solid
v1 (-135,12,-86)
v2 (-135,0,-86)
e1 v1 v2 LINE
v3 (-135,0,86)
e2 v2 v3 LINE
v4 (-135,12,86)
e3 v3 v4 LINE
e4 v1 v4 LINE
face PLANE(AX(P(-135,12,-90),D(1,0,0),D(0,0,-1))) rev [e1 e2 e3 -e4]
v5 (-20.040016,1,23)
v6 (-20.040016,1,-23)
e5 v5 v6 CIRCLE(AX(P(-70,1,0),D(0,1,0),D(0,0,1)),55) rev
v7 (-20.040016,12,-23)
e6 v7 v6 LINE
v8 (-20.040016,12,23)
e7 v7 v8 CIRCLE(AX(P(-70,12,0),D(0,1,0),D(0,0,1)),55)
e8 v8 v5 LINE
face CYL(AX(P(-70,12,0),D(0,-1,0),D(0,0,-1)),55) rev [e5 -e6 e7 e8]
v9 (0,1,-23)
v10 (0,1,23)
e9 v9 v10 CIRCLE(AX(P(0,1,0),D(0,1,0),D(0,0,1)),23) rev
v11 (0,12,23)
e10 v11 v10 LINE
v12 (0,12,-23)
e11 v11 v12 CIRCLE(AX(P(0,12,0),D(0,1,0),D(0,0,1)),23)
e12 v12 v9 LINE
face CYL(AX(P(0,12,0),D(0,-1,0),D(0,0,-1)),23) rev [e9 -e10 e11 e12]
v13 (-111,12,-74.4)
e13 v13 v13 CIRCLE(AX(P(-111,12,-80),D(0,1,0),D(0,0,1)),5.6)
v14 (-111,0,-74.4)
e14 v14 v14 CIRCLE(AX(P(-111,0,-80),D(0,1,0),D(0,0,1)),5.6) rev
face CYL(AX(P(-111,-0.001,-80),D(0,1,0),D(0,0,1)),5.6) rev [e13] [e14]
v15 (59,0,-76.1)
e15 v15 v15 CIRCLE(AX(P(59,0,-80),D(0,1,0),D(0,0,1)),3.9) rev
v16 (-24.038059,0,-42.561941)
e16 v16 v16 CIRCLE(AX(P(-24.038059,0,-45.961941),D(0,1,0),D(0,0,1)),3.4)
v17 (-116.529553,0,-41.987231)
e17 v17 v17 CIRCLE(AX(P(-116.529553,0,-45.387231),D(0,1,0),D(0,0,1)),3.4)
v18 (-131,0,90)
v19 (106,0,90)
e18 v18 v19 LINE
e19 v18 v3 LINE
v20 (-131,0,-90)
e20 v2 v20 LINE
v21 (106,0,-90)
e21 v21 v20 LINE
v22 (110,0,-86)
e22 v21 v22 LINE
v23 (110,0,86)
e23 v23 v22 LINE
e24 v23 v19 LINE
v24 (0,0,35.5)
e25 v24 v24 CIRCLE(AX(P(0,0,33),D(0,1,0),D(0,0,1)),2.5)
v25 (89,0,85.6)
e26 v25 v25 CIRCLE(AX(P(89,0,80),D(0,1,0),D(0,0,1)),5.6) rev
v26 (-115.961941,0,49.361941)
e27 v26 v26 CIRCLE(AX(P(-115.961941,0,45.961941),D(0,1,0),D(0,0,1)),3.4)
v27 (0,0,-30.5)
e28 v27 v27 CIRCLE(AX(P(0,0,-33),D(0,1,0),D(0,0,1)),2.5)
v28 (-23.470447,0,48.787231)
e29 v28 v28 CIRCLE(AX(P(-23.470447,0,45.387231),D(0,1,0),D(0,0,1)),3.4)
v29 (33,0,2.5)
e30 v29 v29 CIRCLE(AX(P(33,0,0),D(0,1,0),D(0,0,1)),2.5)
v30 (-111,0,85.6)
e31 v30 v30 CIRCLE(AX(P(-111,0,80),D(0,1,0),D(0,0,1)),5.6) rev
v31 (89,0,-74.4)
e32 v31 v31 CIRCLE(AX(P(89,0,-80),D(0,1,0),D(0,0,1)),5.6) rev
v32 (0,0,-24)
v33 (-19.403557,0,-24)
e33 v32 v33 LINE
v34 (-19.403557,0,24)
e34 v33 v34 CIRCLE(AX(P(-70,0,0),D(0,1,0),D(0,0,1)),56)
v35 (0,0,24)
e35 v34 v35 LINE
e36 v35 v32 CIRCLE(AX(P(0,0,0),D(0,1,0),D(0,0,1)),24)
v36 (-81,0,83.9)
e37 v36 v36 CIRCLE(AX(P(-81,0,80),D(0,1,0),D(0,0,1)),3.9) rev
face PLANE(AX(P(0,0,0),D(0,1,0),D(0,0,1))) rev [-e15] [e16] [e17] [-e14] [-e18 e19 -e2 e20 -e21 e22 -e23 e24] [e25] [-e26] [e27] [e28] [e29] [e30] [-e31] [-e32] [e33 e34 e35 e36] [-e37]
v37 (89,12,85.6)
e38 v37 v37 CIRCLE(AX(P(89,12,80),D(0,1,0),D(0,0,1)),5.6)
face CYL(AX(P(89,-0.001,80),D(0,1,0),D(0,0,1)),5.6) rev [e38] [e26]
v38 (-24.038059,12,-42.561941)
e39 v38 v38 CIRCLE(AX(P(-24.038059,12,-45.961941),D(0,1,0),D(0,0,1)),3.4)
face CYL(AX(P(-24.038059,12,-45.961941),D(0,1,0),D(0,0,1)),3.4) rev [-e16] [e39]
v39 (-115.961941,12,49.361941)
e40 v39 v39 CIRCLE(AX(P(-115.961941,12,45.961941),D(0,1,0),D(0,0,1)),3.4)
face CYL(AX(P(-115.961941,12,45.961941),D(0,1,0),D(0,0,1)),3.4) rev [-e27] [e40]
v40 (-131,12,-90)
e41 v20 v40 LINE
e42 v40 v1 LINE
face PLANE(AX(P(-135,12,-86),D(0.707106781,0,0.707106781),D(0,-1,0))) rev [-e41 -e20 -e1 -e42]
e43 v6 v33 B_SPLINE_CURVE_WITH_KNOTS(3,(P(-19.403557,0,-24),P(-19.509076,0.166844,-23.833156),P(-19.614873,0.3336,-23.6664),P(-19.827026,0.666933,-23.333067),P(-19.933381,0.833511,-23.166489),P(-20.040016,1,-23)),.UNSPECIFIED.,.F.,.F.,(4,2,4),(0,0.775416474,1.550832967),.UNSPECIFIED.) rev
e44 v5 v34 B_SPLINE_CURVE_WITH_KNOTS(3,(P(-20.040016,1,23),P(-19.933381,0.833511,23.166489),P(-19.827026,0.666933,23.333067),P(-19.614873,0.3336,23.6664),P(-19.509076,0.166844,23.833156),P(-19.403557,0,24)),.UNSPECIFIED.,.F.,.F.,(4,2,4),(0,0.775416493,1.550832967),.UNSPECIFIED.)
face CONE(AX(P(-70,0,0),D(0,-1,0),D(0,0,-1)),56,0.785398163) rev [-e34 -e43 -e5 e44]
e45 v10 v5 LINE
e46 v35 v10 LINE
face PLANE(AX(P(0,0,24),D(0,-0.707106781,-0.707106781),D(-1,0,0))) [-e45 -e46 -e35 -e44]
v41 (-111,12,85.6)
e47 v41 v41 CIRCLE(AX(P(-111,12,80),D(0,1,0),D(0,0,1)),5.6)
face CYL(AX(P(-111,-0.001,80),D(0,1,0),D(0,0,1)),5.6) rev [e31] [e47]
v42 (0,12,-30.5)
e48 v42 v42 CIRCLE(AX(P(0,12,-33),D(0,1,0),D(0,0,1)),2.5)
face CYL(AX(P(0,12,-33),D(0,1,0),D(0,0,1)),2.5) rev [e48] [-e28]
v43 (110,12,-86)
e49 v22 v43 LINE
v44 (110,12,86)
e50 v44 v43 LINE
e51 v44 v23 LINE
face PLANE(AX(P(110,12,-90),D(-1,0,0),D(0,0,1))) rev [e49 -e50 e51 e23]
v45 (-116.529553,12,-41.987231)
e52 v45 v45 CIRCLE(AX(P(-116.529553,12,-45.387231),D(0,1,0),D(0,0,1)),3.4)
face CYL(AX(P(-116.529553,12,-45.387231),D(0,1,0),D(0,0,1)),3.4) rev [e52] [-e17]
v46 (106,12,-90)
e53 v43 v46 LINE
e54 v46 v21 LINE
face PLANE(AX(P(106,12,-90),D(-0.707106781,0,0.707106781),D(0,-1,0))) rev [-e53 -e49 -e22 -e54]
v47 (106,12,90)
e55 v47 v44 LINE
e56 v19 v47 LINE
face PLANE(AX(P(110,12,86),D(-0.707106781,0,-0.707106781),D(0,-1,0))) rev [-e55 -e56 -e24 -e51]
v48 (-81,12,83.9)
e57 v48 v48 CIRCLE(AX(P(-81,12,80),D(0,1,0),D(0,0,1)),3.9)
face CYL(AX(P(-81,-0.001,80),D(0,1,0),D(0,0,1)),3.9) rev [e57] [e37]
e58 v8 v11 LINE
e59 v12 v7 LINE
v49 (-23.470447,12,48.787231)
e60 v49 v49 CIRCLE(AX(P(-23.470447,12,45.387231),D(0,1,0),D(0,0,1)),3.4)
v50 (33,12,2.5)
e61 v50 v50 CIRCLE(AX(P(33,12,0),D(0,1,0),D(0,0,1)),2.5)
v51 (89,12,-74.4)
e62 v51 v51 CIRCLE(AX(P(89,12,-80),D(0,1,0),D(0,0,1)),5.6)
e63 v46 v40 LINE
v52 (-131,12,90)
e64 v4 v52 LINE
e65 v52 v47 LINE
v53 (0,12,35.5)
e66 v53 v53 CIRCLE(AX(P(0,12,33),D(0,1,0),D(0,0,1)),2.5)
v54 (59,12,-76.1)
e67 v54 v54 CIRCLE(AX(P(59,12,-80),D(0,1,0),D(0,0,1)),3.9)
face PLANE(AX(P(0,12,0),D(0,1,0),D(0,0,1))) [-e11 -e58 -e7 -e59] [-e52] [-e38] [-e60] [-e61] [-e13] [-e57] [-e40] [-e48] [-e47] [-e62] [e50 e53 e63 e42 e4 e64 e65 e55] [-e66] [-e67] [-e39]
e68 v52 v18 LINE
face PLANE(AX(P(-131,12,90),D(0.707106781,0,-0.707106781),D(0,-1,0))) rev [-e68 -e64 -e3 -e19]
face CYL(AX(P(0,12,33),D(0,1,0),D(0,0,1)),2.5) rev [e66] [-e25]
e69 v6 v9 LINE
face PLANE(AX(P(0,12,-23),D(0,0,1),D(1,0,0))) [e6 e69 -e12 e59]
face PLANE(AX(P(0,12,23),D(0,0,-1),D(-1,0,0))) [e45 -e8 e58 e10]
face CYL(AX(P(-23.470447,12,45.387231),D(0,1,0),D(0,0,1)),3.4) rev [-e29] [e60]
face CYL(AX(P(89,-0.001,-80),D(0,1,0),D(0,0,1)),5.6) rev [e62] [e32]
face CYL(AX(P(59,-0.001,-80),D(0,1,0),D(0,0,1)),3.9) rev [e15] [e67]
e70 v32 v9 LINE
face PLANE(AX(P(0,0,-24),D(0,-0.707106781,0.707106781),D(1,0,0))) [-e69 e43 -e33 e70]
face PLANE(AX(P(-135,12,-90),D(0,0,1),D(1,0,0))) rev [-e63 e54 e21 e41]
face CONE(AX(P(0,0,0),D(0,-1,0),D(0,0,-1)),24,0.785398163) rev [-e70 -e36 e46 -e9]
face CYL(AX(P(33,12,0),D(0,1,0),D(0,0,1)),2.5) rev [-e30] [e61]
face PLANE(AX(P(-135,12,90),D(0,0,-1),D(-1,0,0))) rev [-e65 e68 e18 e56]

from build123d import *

# Parameters (mm, degrees)
SKETCH1_W                 = 245
SKETCH1_H                 = 180
BOSS_EXTRUDE1_DEPTH       = 12
CHAMFER2_SIZE             = 4
M8_TAPPED_HOLE1_D         = 6.8
M6_TAPPED_HOLE1_D         = 5
CHAMFER3_SIZE             = 1
SKETCH_PATTERN1_OUTLINE_R = 2.5
SKETCH_PATTERN1_DEPTH     = 12
SKETCH_PATTERN2_OUTLINE_R = 3.4
SKETCH_PATTERN2_DEPTH     = 12
CUT_EXTRUDE1_REACH        = 164.693
SKETCH11_R                = 5.6
SKETCH_PATTERN4_OUTLINE_R = 3.9
SKETCH_PATTERN4_DEPTH     = 12


# Read off the part's stored shape, not the designer's step: Sketch-Pattern1, Sketch-Pattern2, Sketch-Pattern4
with BuildPart() as part:
    # Sketch1 → Boss-Extrude1 (new body)
    with BuildSketch(Plane(origin=(0, 0, 0), x_dir=(1, 0, 0), z_dir=(0, 1, 0))):
        with Locations((-12.5, 0)):
            Rectangle(SKETCH1_W, SKETCH1_H)
        with BuildLine():
            Line((0, 23), (-20.040016013, 23))
            ThreePointArc((-20.040016013, 23), (-125, 0), (-20.040016013, -23))
            Line((-20.040016013, -23), (0, -23))
            ThreePointArc((0, -23), (23, 0), (0, 23))
        make_face(mode=Mode.SUBTRACT)
    extrude(amount=BOSS_EXTRUDE1_DEPTH)

    # Chamfer2
    chamfer2_edges = [part.edges().sort_by_distance(p)[0] for p in [
        (-135, 6, -90),
        (110, 6, -90),
        (110, 6, 90),
        (-135, 6, 90),
    ]]
    chamfer(chamfer2_edges, length=CHAMFER2_SIZE)

    # M8 Tapped Hole1 (through all)
    with Locations(Plane(origin=(0, 12, 0), x_dir=(1, 0, 0), z_dir=(0, 1, 0))):
        with Locations((-115.961940777, -45.961940777)):
            Hole(M8_TAPPED_HOLE1_D / 2)

    # M6 Tapped Hole1 (through all)
    with Locations(Plane(origin=(0, 12, 0), x_dir=(1, 0, 0), z_dir=(0, 1, 0))):
        with Locations((0, 33)):
            Hole(M6_TAPPED_HOLE1_D / 2)

    # Chamfer3
    chamfer3_edges = [part.edges().sort_by_distance(p)[0] for p in [
        (23, 0, 0),
        (-10.020008006, 0, -23),
        (-125, 0, 0),
        (-10.020008006, 0, 23),
    ]]
    chamfer(chamfer3_edges, length=CHAMFER3_SIZE)

    # Sketch-Pattern1 outline → Sketch-Pattern1 (cut)
    with BuildSketch(Plane(origin=(0, 0, 0), x_dir=(1, 0, 0), z_dir=(0, 1, 0))):
        with Locations((0, -33)):
            Circle(SKETCH_PATTERN1_OUTLINE_R)
        with Locations((33, 0)):
            Circle(SKETCH_PATTERN1_OUTLINE_R)
    extrude(amount=SKETCH_PATTERN1_DEPTH, mode=Mode.SUBTRACT)

    # Sketch-Pattern2 outline → Sketch-Pattern2 (cut)
    with BuildSketch(Plane(origin=(0, 0, 0), x_dir=(1, 0, 0), z_dir=(0, 1, 0))):
        with Locations((-116.529552601, 45.387230966)):
            Circle(SKETCH_PATTERN2_OUTLINE_R)
        with Locations((-24.038059223, 45.961940777)):
            Circle(SKETCH_PATTERN2_OUTLINE_R)
        with Locations((-23.470447399, -45.387230966)):
            Circle(SKETCH_PATTERN2_OUTLINE_R)
    extrude(amount=SKETCH_PATTERN2_DEPTH, mode=Mode.SUBTRACT)

    # Sketch11 → Cut-Extrude1 (cut, up to next)
    with BuildSketch(Plane(origin=(0, 12, 0), x_dir=(1, 0, 0), z_dir=(0, 1, 0)), mode=Mode.PRIVATE) as cut_extrude1_sk1:
        with Locations(Location((-111, -80, 0), (0, 0, 270))):
            Circle(SKETCH11_R)
    cut_extrude1_tool1 = extrude(cut_extrude1_sk1.sketch, amount=-CUT_EXTRUDE1_REACH, mode=Mode.PRIVATE) & part.part
    cut_extrude1 = cut_extrude1_tool1.solids().sort_by_distance((-111, 12, 80))[0]
    add(cut_extrude1, mode=Mode.SUBTRACT)

    # Sketch-Pattern3: Cut-Extrude1 at 3 more places
    with Locations((200, 0, 0), (200, 0, -160), (0, 0, -160)):
        add(cut_extrude1, mode=Mode.SUBTRACT)

    # Sketch-Pattern4 outline → Sketch-Pattern4 (cut)
    with BuildSketch(Plane(origin=(0, 0, 0), x_dir=(1, 0, 0), z_dir=(0, 1, 0))):
        with Locations((-81, -80)):
            Circle(SKETCH_PATTERN4_OUTLINE_R)
        with Locations((59, 80)):
            Circle(SKETCH_PATTERN4_OUTLINE_R)
    extrude(amount=SKETCH_PATTERN4_DEPTH, mode=Mode.SUBTRACT)


solid = part.part
